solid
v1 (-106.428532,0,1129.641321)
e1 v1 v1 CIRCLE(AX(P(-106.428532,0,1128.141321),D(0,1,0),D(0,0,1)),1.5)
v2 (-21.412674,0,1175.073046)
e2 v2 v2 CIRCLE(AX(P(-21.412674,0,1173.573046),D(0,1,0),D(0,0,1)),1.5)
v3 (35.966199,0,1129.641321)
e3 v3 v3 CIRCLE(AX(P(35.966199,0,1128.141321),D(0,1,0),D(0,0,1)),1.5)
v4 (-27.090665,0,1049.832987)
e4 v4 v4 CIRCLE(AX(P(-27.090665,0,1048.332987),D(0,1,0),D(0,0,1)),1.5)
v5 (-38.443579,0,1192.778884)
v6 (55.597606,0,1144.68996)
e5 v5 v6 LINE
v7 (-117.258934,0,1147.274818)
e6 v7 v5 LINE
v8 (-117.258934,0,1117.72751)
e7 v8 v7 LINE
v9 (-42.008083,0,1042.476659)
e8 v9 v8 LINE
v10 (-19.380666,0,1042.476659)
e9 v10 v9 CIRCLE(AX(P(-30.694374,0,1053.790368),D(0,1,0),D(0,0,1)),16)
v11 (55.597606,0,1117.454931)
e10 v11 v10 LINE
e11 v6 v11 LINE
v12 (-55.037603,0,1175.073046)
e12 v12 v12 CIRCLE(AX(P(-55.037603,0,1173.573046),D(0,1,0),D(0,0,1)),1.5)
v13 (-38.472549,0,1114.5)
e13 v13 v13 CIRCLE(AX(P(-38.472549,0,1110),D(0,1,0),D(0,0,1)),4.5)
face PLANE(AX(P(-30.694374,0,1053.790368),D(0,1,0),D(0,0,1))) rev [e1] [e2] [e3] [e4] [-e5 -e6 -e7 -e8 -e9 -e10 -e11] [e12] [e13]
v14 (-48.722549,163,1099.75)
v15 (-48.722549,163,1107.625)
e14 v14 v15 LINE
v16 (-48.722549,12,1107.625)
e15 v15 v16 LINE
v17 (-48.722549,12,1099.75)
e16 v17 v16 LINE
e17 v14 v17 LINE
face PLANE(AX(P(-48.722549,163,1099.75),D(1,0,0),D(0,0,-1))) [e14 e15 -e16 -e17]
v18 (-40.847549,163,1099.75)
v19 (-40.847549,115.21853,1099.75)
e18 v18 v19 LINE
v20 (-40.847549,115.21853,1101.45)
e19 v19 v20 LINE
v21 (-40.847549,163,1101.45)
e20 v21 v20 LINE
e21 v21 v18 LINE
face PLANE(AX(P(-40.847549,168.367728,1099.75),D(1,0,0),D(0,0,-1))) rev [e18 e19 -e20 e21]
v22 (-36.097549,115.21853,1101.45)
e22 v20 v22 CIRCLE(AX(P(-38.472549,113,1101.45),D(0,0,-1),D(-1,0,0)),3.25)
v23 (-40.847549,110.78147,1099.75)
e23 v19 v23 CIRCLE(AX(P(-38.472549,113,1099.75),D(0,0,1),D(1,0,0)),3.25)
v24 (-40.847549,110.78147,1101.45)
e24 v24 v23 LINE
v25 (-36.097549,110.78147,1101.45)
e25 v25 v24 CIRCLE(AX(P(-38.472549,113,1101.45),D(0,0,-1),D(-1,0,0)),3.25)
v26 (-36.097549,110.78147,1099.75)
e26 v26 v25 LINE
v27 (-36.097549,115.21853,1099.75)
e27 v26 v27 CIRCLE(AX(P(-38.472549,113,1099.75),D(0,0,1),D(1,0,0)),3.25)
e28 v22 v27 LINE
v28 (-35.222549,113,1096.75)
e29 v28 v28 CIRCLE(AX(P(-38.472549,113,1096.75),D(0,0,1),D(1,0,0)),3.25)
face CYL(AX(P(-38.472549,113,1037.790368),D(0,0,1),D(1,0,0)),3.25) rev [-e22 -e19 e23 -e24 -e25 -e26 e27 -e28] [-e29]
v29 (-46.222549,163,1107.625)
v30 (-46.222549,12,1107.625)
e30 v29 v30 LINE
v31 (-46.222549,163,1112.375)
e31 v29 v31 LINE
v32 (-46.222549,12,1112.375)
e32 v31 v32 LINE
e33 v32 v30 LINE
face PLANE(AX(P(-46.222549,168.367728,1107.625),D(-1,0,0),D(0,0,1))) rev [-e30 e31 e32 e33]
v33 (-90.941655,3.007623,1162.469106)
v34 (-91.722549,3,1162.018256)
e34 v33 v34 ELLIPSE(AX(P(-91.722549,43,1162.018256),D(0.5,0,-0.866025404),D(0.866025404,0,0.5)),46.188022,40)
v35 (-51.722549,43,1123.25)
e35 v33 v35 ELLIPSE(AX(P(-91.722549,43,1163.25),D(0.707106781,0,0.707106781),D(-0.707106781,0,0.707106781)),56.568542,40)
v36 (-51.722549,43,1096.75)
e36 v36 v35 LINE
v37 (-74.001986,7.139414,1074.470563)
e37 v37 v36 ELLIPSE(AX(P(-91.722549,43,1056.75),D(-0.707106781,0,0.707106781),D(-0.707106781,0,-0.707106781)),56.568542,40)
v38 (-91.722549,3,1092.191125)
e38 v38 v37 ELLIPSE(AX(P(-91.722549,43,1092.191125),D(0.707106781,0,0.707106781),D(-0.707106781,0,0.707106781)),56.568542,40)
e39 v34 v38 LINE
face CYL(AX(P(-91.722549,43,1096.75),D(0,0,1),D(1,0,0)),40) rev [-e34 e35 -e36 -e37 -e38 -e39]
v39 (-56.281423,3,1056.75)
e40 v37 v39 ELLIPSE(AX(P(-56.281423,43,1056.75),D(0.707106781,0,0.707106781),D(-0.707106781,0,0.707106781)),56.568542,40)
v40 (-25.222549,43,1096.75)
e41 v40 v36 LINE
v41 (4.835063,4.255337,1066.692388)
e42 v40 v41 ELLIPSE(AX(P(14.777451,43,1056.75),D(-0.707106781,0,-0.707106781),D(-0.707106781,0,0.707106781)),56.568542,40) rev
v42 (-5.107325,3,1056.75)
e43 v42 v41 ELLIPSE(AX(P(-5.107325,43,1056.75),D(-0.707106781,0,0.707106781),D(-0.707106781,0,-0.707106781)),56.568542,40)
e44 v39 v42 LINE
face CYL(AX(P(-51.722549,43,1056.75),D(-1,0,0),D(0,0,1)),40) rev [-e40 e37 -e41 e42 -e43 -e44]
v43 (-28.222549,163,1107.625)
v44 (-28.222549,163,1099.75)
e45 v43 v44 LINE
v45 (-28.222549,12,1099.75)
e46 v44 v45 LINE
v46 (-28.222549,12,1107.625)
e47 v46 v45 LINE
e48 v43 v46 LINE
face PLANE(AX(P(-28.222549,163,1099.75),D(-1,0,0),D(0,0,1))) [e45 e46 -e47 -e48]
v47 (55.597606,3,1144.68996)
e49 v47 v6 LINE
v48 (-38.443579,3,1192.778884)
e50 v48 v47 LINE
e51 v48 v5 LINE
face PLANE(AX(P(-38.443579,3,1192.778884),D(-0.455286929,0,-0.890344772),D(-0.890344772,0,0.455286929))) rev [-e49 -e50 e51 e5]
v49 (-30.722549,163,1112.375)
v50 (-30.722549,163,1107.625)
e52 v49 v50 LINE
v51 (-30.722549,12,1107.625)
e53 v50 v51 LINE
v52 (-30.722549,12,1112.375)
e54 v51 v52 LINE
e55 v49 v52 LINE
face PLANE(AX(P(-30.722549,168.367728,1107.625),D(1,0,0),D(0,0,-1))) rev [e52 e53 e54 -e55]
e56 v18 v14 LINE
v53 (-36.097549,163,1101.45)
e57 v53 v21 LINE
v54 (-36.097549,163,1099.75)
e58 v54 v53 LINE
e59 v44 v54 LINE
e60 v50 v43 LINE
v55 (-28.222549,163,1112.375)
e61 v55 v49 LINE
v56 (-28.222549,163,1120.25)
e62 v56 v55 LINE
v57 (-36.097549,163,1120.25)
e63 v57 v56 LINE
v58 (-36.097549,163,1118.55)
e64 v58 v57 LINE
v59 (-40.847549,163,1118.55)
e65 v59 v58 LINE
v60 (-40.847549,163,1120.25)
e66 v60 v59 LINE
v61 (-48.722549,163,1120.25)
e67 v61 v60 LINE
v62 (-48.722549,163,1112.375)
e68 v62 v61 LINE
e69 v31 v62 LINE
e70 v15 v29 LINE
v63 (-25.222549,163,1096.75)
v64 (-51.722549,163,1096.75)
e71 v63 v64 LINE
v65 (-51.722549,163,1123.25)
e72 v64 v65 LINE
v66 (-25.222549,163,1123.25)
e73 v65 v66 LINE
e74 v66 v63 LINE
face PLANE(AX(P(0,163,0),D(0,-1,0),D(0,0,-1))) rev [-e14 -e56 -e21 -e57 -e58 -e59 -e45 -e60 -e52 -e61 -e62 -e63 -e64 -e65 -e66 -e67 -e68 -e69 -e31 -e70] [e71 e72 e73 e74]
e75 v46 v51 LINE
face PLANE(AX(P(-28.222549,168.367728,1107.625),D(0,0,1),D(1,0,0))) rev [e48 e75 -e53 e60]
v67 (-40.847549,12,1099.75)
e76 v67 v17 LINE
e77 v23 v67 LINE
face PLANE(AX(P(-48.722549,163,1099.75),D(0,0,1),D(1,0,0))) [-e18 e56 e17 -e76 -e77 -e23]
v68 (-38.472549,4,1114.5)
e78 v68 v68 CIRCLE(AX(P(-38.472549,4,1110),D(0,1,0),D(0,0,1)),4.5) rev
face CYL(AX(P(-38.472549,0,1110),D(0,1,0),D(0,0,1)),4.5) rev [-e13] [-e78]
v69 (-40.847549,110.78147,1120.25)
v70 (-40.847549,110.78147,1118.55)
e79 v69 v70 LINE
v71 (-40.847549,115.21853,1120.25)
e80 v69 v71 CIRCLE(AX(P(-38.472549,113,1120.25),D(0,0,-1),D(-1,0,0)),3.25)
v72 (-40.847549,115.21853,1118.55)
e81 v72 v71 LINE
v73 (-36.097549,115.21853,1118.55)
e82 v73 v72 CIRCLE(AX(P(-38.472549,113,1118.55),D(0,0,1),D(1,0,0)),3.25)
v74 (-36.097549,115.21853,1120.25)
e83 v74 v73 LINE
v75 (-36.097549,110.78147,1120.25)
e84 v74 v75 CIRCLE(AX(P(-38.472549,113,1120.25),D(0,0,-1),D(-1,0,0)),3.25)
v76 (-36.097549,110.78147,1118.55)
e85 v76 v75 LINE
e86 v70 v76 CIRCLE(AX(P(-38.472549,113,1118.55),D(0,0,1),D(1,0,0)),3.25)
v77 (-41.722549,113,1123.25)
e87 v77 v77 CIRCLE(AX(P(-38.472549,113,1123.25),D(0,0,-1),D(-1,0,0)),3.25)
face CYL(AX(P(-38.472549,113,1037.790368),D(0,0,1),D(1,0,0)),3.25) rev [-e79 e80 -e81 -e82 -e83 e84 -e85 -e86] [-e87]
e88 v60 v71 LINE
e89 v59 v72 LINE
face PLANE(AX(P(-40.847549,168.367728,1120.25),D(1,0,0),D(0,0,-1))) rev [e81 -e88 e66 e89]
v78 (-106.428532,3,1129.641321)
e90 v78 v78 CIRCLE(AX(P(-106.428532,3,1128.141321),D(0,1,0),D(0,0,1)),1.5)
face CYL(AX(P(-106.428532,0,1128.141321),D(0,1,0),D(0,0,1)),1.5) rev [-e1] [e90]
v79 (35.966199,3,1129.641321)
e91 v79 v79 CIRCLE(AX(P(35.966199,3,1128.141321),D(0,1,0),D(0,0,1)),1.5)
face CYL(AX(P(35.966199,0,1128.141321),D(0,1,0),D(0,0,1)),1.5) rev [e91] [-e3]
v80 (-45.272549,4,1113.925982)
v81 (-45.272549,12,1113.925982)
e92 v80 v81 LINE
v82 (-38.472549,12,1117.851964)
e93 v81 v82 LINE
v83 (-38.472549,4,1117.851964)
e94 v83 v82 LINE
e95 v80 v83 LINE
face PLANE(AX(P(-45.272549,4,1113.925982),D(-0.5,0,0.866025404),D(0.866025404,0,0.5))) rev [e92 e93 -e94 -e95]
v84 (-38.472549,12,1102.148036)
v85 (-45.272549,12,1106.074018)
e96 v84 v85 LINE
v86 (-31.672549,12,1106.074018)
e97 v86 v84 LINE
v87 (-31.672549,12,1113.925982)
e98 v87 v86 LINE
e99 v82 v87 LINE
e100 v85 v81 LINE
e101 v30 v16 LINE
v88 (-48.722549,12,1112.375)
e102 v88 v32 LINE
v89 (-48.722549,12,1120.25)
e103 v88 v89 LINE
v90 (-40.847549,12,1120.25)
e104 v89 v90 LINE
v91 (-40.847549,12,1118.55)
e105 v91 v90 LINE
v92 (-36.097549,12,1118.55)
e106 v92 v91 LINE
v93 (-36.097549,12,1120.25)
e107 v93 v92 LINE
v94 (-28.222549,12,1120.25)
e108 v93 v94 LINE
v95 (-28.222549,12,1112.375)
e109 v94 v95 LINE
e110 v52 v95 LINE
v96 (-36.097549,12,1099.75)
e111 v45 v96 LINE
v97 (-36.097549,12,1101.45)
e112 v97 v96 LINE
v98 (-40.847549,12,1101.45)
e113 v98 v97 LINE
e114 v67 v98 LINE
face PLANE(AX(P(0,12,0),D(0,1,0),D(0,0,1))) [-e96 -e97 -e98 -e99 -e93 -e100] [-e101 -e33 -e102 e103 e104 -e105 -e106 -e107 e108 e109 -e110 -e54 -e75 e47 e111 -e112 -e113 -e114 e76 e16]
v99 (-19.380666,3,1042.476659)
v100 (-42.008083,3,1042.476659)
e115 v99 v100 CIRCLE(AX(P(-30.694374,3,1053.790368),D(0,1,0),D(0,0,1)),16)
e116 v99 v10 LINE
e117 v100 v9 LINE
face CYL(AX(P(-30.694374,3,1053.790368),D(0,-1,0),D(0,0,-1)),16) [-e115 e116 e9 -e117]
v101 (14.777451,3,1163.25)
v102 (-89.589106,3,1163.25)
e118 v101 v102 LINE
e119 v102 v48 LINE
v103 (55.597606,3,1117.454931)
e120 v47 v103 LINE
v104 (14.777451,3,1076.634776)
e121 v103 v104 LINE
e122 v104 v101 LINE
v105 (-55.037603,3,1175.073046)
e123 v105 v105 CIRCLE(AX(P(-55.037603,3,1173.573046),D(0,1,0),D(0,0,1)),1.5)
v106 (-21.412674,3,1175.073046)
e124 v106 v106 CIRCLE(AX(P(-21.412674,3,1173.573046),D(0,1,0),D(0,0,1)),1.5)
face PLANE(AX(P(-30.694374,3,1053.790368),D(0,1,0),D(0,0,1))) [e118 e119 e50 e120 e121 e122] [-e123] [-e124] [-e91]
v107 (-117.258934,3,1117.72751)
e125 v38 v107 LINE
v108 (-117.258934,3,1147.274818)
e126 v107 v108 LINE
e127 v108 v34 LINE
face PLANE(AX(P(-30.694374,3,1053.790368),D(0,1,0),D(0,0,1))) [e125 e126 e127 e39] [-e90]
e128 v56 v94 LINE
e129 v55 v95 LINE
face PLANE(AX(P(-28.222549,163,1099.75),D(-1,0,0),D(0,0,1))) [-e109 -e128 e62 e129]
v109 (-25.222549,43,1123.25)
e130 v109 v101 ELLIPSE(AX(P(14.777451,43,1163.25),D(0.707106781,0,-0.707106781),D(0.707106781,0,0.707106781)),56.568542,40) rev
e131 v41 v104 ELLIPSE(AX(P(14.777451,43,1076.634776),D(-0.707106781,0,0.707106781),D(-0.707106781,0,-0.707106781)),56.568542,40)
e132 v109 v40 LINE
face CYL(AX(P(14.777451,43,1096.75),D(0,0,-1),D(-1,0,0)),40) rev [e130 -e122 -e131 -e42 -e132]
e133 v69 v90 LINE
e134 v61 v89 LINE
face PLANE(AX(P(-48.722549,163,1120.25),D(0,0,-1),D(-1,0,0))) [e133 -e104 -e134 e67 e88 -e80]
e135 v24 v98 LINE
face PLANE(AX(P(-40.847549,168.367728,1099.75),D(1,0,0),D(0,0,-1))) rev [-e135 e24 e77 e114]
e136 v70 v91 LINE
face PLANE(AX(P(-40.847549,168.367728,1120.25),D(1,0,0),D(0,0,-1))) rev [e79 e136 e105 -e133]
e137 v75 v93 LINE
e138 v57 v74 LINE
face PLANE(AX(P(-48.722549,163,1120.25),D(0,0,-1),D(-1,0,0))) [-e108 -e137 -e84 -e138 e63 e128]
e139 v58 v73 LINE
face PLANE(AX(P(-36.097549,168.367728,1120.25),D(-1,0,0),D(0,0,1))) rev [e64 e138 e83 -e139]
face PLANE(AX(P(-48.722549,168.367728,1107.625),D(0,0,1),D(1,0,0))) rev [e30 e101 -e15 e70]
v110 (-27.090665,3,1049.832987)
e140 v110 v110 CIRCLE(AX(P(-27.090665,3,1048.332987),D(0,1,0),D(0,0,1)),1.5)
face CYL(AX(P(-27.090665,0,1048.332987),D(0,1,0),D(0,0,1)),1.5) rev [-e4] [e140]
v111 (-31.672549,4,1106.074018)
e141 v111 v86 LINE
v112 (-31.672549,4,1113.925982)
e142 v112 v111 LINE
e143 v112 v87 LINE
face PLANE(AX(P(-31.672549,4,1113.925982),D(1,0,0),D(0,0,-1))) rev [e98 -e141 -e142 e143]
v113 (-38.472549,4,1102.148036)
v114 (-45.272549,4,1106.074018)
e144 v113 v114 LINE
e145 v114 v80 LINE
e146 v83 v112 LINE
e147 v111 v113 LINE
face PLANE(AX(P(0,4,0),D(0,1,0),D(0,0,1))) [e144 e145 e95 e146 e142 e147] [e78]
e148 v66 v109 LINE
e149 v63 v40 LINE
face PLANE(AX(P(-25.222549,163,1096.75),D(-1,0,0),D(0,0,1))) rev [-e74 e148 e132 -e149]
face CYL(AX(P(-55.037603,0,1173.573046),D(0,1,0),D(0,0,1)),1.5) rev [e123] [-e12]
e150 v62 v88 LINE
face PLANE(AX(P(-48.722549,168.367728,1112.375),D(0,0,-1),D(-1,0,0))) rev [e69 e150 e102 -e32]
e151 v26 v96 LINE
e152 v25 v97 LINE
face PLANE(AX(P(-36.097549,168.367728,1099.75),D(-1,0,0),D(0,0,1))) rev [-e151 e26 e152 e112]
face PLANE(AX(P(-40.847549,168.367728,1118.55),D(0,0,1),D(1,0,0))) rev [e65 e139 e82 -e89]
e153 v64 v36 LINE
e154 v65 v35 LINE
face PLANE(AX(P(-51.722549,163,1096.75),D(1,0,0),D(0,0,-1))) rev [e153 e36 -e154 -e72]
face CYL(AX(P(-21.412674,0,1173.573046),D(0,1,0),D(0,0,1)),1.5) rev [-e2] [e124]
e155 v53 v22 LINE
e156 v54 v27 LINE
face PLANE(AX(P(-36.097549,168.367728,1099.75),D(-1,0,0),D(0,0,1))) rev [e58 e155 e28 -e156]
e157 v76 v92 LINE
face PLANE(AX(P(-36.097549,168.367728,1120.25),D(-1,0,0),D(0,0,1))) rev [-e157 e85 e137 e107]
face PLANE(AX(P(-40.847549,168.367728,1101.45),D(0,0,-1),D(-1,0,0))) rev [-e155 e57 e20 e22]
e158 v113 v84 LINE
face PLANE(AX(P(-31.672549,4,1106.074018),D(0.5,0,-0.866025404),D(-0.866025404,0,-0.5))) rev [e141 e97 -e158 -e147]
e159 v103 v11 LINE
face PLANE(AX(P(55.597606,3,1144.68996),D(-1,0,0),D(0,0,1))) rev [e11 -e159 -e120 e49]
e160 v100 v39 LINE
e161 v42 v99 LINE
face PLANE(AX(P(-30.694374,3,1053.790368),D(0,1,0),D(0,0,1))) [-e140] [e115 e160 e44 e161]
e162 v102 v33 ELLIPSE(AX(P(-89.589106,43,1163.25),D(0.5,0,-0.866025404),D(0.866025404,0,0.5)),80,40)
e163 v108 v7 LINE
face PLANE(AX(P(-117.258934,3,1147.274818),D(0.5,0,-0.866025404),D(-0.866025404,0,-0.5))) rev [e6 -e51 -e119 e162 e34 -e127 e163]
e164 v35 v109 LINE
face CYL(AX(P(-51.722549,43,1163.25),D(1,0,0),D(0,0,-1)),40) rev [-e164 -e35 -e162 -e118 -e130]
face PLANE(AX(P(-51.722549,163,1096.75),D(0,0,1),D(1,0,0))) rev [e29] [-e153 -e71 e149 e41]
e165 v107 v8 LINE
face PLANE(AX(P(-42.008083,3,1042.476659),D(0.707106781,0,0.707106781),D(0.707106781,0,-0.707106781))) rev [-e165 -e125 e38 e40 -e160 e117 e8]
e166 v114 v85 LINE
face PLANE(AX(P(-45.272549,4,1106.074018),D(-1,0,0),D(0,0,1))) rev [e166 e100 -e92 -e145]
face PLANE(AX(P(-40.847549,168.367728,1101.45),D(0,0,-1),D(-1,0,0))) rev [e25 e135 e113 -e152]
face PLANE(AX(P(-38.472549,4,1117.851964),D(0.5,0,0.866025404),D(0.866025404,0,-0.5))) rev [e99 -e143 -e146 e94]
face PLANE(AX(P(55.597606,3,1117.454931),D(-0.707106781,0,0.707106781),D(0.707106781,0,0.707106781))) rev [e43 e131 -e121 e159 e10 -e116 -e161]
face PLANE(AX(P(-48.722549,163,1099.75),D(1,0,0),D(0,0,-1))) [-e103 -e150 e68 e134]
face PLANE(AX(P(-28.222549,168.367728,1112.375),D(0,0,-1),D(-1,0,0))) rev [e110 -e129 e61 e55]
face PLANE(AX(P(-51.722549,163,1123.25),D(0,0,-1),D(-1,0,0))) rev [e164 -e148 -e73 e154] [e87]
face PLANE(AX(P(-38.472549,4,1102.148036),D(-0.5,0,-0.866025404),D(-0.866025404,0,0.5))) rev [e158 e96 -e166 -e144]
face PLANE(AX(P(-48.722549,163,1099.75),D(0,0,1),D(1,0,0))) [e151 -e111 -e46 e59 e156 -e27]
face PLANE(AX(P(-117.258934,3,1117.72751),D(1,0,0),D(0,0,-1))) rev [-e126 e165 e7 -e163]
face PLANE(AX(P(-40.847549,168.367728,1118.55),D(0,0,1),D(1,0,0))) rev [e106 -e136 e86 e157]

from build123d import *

# Parameters (mm, degrees)
SALIENTE_EXTRUIR1_DEPTH    = 3
CROQUIS2_W                 = 26.5
CROQUIS2_H                 = 26.5
CROQUIS2_W_2               = 20.5
CROQUIS2_H_2               = 20.5
SALIENTE_EXTRUIR2_DEPTH    = 160
REDONDEO1_R                = 40
CROQUIS3_W                 = 20.5
CROQUIS3_H                 = 20.5
SALIENTE_EXTRUIR3_DEPTH    = 12
CORTAR_EXTRUIR1_DEPTH      = 1209.003362467
CORTAR_EXTRUIR1_DEPTH_BACK = 1209.003362467
CROQUIS5_R                 = 4.5
CORTAR_EXTRUIR2_DEPTH      = 8
CROQUIS7_W                 = 4.75
CROQUIS7_H                 = 1.7
CROQUIS7_W_2               = 2.5
CROQUIS7_H_2               = 4.75
SALIENTE_EXTRUIR4_DEPTH    = 151
CORTAR_EXTRUIR4_DEPTH      = 219.224669206
CORTAR_EXTRUIR4_DEPTH_BACK = 219.224669206
CROQUIS8_R                 = 3.25
CROQUIS9_R                 = 1.5
CORTAR_EXTRUIR5_DEPTH      = 1210.16133073


with BuildPart() as part:
    # Croquis1 → Saliente-Extruir1 (new body)
    with BuildSketch(Plane(origin=(0, 0, 0), x_dir=(1, 0, 0), z_dir=(0, 1, 0))):
        with BuildLine():
            Line((-42.008082749, -1042.476659403), (-117.258933696, -1117.72751035))
            Line((-117.258933696, -1117.72751035), (-117.258933696, -1147.274817598))
            Line((-117.258933696, -1147.274817598), (-38.443578675, -1192.778884036))
            Line((-38.443578675, -1192.778884036), (55.597605894, -1144.689960025))
            Line((55.597605894, -1144.689960025), (55.597605894, -1117.454931048))
            Line((55.597605894, -1117.454931048), (-19.380665751, -1042.476659403))
            ThreePointArc((-19.380665751, -1042.476659403), (-30.69437425, -1037.790367902), (-42.008082749, -1042.476659403))
        make_face()
    extrude(amount=SALIENTE_EXTRUIR1_DEPTH)

    # Croquis2 → Saliente-Extruir2 (add)
    with BuildSketch(Plane(origin=(0, 3, 0), x_dir=(1, 0, 0), z_dir=(0, 1, 0))):
        with Locations((-38.472548844, -1110)):
            Rectangle(CROQUIS2_W, CROQUIS2_H)
        with Locations((-38.472548844, -1110)):
            Rectangle(CROQUIS2_W_2, CROQUIS2_H_2, mode=Mode.SUBTRACT)
    extrude(amount=SALIENTE_EXTRUIR2_DEPTH)

    # Redondeo1
    # the kernel refuses this fillet: 40 mm, written as the material it adds along each edge
    with BuildSketch(Plane(origin=(-25.222548844, 3, 1096.75), x_dir=(0, 0, -1), z_dir=(-1, 0, 0)), Plane(origin=(-51.722548844, 3, 1096.75), x_dir=(-1, 0, 0), z_dir=(0, 0, 1)), Plane(origin=(-51.722548844, 3, 1123.25), x_dir=(0, 0, 1), z_dir=(1, 0, 0)), Plane(origin=(-25.222548844, 3, 1123.25), x_dir=(1, 0, 0), z_dir=(0, 0, -1))) as redondeo1_piece_1:
        with BuildLine():
            CenterArc((REDONDEO1_R, -REDONDEO1_R), REDONDEO1_R, 90, 90)
            Line((0, -REDONDEO1_R), (-REDONDEO1_R * 0.02, -REDONDEO1_R))
            Line((-REDONDEO1_R * 0.02, -REDONDEO1_R), (-REDONDEO1_R * 0.02, REDONDEO1_R * 0.02))
            Line((-REDONDEO1_R * 0.02, REDONDEO1_R * 0.02), (REDONDEO1_R, REDONDEO1_R * 0.02))
            Line((REDONDEO1_R, REDONDEO1_R * 0.02), (REDONDEO1_R, 0))
        make_face()
    extrude(amount=26.5)
    with BuildSketch(Plane(origin=(-25.222548844, 3, 1123.25), x_dir=(1, 0, 0), z_dir=(0, 0, -1))) as redondeo1_piece_2a_section:
        with BuildLine():
            CenterArc((REDONDEO1_R, -REDONDEO1_R), REDONDEO1_R, 90, 90)
            Line((0, -REDONDEO1_R), (-REDONDEO1_R * 0.02, -REDONDEO1_R))
            Line((-REDONDEO1_R * 0.02, -REDONDEO1_R), (-REDONDEO1_R * 0.02, REDONDEO1_R * 0.02))
            Line((-REDONDEO1_R * 0.02, REDONDEO1_R * 0.02), (REDONDEO1_R, REDONDEO1_R * 0.02))
            Line((REDONDEO1_R, REDONDEO1_R * 0.02), (REDONDEO1_R, 0))
        make_face()
    redondeo1_piece_2a = extrude(amount=66.5, mode=Mode.PRIVATE)
    redondeo1_piece_2a = split(redondeo1_piece_2a, bisect_by=Plane(origin=(-0.706292993, 12.233154951, 1061.151032162), z_dir=(-0.7071067811865465, 0, 0.7071067811865487)), keep=Keep.TOP, mode=Mode.PRIVATE)
    redondeo1_piece_2a = split(redondeo1_piece_2a, bisect_by=Plane(origin=(-16.60527909, 12.233154951, 1096.75), z_dir=(0, 0, -1)), keep=Keep.TOP, mode=Mode.PRIVATE)
    with BuildSketch(Plane(origin=(14.777451156, 3, 1096.75), x_dir=(0, 0, -1), z_dir=(-1, 0, 0))) as redondeo1_piece_2b_section:
        with BuildLine():
            CenterArc((REDONDEO1_R, -REDONDEO1_R), REDONDEO1_R, 90, 90)
            Line((0, -REDONDEO1_R), (-REDONDEO1_R * 0.02, -REDONDEO1_R))
            Line((-REDONDEO1_R * 0.02, -REDONDEO1_R), (-REDONDEO1_R * 0.02, REDONDEO1_R * 0.02))
            Line((-REDONDEO1_R * 0.02, REDONDEO1_R * 0.02), (REDONDEO1_R, REDONDEO1_R * 0.02))
            Line((REDONDEO1_R, REDONDEO1_R * 0.02), (REDONDEO1_R, 0))
        make_face()
    redondeo1_piece_2b = extrude(amount=66.5, mode=Mode.PRIVATE)
    redondeo1_piece_2b = split(redondeo1_piece_2b, bisect_by=Plane(origin=(10.376418995, 12.233154951, 1072.233744149), z_dir=(-0.7071067811865465, 0, 0.7071067811865487)), keep=Keep.TOP, mode=Mode.PRIVATE)
    redondeo1_piece_2b = split(redondeo1_piece_2b, bisect_by=Plane(origin=(-25.222548844, 12.233154951, 1088.132730246), z_dir=(1, 0, 0)), keep=Keep.TOP, mode=Mode.PRIVATE)
    redondeo1_piece_2 = redondeo1_piece_2a & redondeo1_piece_2b
    add(redondeo1_piece_2)
    with BuildSketch(Plane(origin=(-51.722548844, 3, 1056.75), x_dir=(-1, 0, 0), z_dir=(0, 0, 1))) as redondeo1_piece_3a_section:
        with BuildLine():
            CenterArc((REDONDEO1_R, -REDONDEO1_R), REDONDEO1_R, 90, 90)
            Line((0, -REDONDEO1_R), (-REDONDEO1_R * 0.02, -REDONDEO1_R))
            Line((-REDONDEO1_R * 0.02, -REDONDEO1_R), (-REDONDEO1_R * 0.02, REDONDEO1_R * 0.02))
            Line((-REDONDEO1_R * 0.02, REDONDEO1_R * 0.02), (REDONDEO1_R, REDONDEO1_R * 0.02))
            Line((REDONDEO1_R, REDONDEO1_R * 0.02), (REDONDEO1_R, 0))
        make_face()
    redondeo1_piece_3a = extrude(amount=66.5, mode=Mode.PRIVATE)
    redondeo1_piece_3a = split(redondeo1_piece_3a, bisect_by=Plane(origin=(-68.586290047, 13.081785703, 1069.0548667), z_dir=(0.70710678118655, 0, 0.7071067811865451)), keep=Keep.TOP, mode=Mode.PRIVATE)
    redondeo1_piece_3a = split(redondeo1_piece_3a, bisect_by=Plane(origin=(-58.896332092, 13.081785703, 1096.75), z_dir=(0, 0, -1)), keep=Keep.TOP, mode=Mode.PRIVATE)
    with BuildSketch(Plane(origin=(-25.222548844, 3, 1096.75), x_dir=(0, 0, -1), z_dir=(-1, 0, 0))) as redondeo1_piece_3b_section:
        with BuildLine():
            CenterArc((REDONDEO1_R, -REDONDEO1_R), REDONDEO1_R, 90, 90)
            Line((0, -REDONDEO1_R), (-REDONDEO1_R * 0.02, -REDONDEO1_R))
            Line((-REDONDEO1_R * 0.02, -REDONDEO1_R), (-REDONDEO1_R * 0.02, REDONDEO1_R * 0.02))
            Line((-REDONDEO1_R * 0.02, REDONDEO1_R * 0.02), (REDONDEO1_R, REDONDEO1_R * 0.02))
            Line((REDONDEO1_R, REDONDEO1_R * 0.02), (REDONDEO1_R, 0))
        make_face()
    redondeo1_piece_3b = extrude(amount=66.5, mode=Mode.PRIVATE)
    redondeo1_piece_3b = split(redondeo1_piece_3b, bisect_by=Plane(origin=(-79.417682144, 13.081785703, 1079.886258797), z_dir=(0.70710678118655, 0, 0.7071067811865451)), keep=Keep.TOP, mode=Mode.PRIVATE)
    redondeo1_piece_3b = split(redondeo1_piece_3b, bisect_by=Plane(origin=(-51.722548844, 13.081785703, 1089.576216751), z_dir=(-1, 0, 0)), keep=Keep.TOP, mode=Mode.PRIVATE)
    redondeo1_piece_3 = redondeo1_piece_3a & redondeo1_piece_3b
    add(redondeo1_piece_3)
    with BuildSketch(Plane(origin=(-51.722548844, 3, 1096.75), x_dir=(-1, 0, 0), z_dir=(0, 0, 1))) as redondeo1_piece_4a_section:
        with BuildLine():
            CenterArc((REDONDEO1_R, -REDONDEO1_R), REDONDEO1_R, 90, 90)
            Line((0, -REDONDEO1_R), (-REDONDEO1_R * 0.02, -REDONDEO1_R))
            Line((-REDONDEO1_R * 0.02, -REDONDEO1_R), (-REDONDEO1_R * 0.02, REDONDEO1_R * 0.02))
            Line((-REDONDEO1_R * 0.02, REDONDEO1_R * 0.02), (REDONDEO1_R, REDONDEO1_R * 0.02))
            Line((REDONDEO1_R, REDONDEO1_R * 0.02), (REDONDEO1_R, 0))
        make_face()
    redondeo1_piece_4a = extrude(amount=66.5, mode=Mode.PRIVATE)
    redondeo1_piece_4a = split(redondeo1_piece_4a, bisect_by=Plane(origin=(-76.640371014, 12.056420545, 1170.725955696), z_dir=(0.4999999999999994, 0, -0.866025403784439)), keep=Keep.TOP, mode=Mode.PRIVATE)
    redondeo1_piece_4a = split(redondeo1_piece_4a, bisect_by=Plane(origin=(-60.776383391, 12.056420545, 1123.25), z_dir=(0, 0, 1)), keep=Keep.TOP, mode=Mode.PRIVATE)
    with BuildSketch(Plane(origin=(-91.722548844, 3, 1123.25), x_dir=(0, 0, 1), z_dir=(1, 0, 0))) as redondeo1_piece_4b_section:
        with BuildLine():
            CenterArc((REDONDEO1_R, -REDONDEO1_R), REDONDEO1_R, 90, 90)
            Line((0, -REDONDEO1_R), (-REDONDEO1_R * 0.02, -REDONDEO1_R))
            Line((-REDONDEO1_R * 0.02, -REDONDEO1_R), (-REDONDEO1_R * 0.02, REDONDEO1_R * 0.02))
            Line((-REDONDEO1_R * 0.02, REDONDEO1_R * 0.02), (REDONDEO1_R, REDONDEO1_R * 0.02))
            Line((REDONDEO1_R, REDONDEO1_R * 0.02), (REDONDEO1_R, 0))
        make_face()
    redondeo1_piece_4b = extrude(amount=66.5, mode=Mode.PRIVATE)
    redondeo1_piece_4b = split(redondeo1_piece_4b, bisect_by=Plane(origin=(-89.588337219, 12.056415941, 1163.250443922), z_dir=(0.4999999999999994, 0, -0.866025403784439)), keep=Keep.TOP, mode=Mode.PRIVATE)
    redondeo1_piece_4b = split(redondeo1_piece_4b, bisect_by=Plane(origin=(-51.722548844, 12.056415941, 1132.303830155), z_dir=(-1, 0, 0)), keep=Keep.TOP, mode=Mode.PRIVATE)
    redondeo1_piece_4 = redondeo1_piece_4a & redondeo1_piece_4b
    add(redondeo1_piece_4)
    with BuildSketch(Plane(origin=(-51.722548844, 3, 1123.25), x_dir=(0, 0, 1), z_dir=(1, 0, 0))) as redondeo1_piece_5a_section:
        with BuildLine():
            CenterArc((REDONDEO1_R, -REDONDEO1_R), REDONDEO1_R, 90, 90)
            Line((0, -REDONDEO1_R), (-REDONDEO1_R * 0.02, -REDONDEO1_R))
            Line((-REDONDEO1_R * 0.02, -REDONDEO1_R), (-REDONDEO1_R * 0.02, REDONDEO1_R * 0.02))
            Line((-REDONDEO1_R * 0.02, REDONDEO1_R * 0.02), (REDONDEO1_R, REDONDEO1_R * 0.02))
            Line((REDONDEO1_R, REDONDEO1_R * 0.02), (REDONDEO1_R, 0))
        make_face()
    redondeo1_piece_5a = extrude(amount=66.5, mode=Mode.PRIVATE)
    redondeo1_piece_5a = split(redondeo1_piece_5a, bisect_by=Plane(origin=(-25.222548844, 12.055804571, 1132.305804571), z_dir=(1, 0, 0)), keep=Keep.TOP, mode=Mode.PRIVATE)
    with BuildSketch(Plane(origin=(-25.222548844, 3, 1163.25), x_dir=(1, 0, 0), z_dir=(0, 0, -1))) as redondeo1_piece_5b_section:
        with BuildLine():
            CenterArc((REDONDEO1_R, -REDONDEO1_R), REDONDEO1_R, 90, 90)
            Line((0, -REDONDEO1_R), (-REDONDEO1_R * 0.02, -REDONDEO1_R))
            Line((-REDONDEO1_R * 0.02, -REDONDEO1_R), (-REDONDEO1_R * 0.02, REDONDEO1_R * 0.02))
            Line((-REDONDEO1_R * 0.02, REDONDEO1_R * 0.02), (REDONDEO1_R, REDONDEO1_R * 0.02))
            Line((REDONDEO1_R, REDONDEO1_R * 0.02), (REDONDEO1_R, 0))
        make_face()
    redondeo1_piece_5b = extrude(amount=66.5, mode=Mode.PRIVATE)
    redondeo1_piece_5b = split(redondeo1_piece_5b, bisect_by=Plane(origin=(-16.166744273, 12.055804571, 1123.25), z_dir=(0, 0, 1)), keep=Keep.TOP, mode=Mode.PRIVATE)
    redondeo1_piece_5 = redondeo1_piece_5a & redondeo1_piece_5b
    add(redondeo1_piece_5)

    # Croquis3 → Saliente-Extruir3 (add)
    with BuildSketch(Plane(origin=(0, 0, 0), x_dir=(1, 0, 0), z_dir=(0, 1, 0))):
        with Locations((-38.472548844, -1110)):
            Rectangle(CROQUIS3_W, CROQUIS3_H)
    extrude(amount=SALIENTE_EXTRUIR3_DEPTH)

    # Croquis5 → Cortar-Extruir1 (cut, two sides: drawn at the far end of the back side and taken through both)
    with BuildSketch(Plane(origin=(0, 12, 0), x_dir=(1, 0, 0), z_dir=(0, 1, 0)).offset(-CORTAR_EXTRUIR1_DEPTH_BACK)):
        with Locations(Location((-38.472548844, -1110, 0), (0, 0, 270))):
            Circle(CROQUIS5_R)
    extrude(amount=CORTAR_EXTRUIR1_DEPTH + CORTAR_EXTRUIR1_DEPTH_BACK, mode=Mode.SUBTRACT)

    # Croquis6 → Cortar-Extruir2 (cut)
    with BuildSketch(Plane(origin=(0, 12, 0), x_dir=(1, 0, 0), z_dir=(0, 1, 0))):
        Polygon((-38.472548844, -1102.148036339), (-45.272548844, -1106.07401817), (-45.272548844, -1113.92598183), (-38.472548844, -1117.851963661), (-31.672548844, -1113.92598183), (-31.672548844, -1106.07401817), align=None)
    extrude(amount=-CORTAR_EXTRUIR2_DEPTH, mode=Mode.SUBTRACT)

    # Croquis7 → Saliente-Extruir4 (add)
    with BuildSketch(Plane(origin=(0, 12, 0), x_dir=(1, 0, 0), z_dir=(0, 1, 0))):
        with Locations((-38.472548844, -1100.6)):
            Rectangle(CROQUIS7_W, CROQUIS7_H)
        with Locations((-47.472548844, -1110)):
            Rectangle(CROQUIS7_W_2, CROQUIS7_H_2)
        with Locations((-38.472548844, -1119.4)):
            Rectangle(CROQUIS7_W, CROQUIS7_H)
        with Locations((-29.472548844, -1110)):
            Rectangle(CROQUIS7_W_2, CROQUIS7_H_2)
    extrude(amount=SALIENTE_EXTRUIR4_DEPTH)

    # Croquis8 → Cortar-Extruir4 (cut, two sides: drawn at the far end of the back side and taken through both)
    with BuildSketch(Plane.XY.offset(1123.25).offset(-CORTAR_EXTRUIR4_DEPTH_BACK)):
        with Locations((-38.472548844, 113)):
            Circle(CROQUIS8_R)
    extrude(amount=CORTAR_EXTRUIR4_DEPTH + CORTAR_EXTRUIR4_DEPTH_BACK, mode=Mode.SUBTRACT)

    # Croquis9 → Cortar-Extruir5 (cut, through all)
    with BuildSketch(Plane(origin=(0, 3, 0), x_dir=(1, 0, 0), z_dir=(0, 1, 0))):
        with Locations(Location((-27.090664648, -1048.332987398, 0), (0, 0, 270))):
            Circle(CROQUIS9_R)
        with Locations(Location((-106.428532016, -1128.141321277, 0), (0, 0, 270))):
            Circle(CROQUIS9_R)
        with Locations(Location((-55.03760272, -1173.573045968, 0), (0, 0, 270))):
            Circle(CROQUIS9_R)
        with Locations(Location((-21.412673883, -1173.573045968, 0), (0, 0, 270))):
            Circle(CROQUIS9_R)
        with Locations(Location((35.966198897, -1128.141321277, 0), (0, 0, 270))):
            Circle(CROQUIS9_R)
    extrude(amount=-CORTAR_EXTRUIR5_DEPTH, mode=Mode.SUBTRACT)


solid = part.part
